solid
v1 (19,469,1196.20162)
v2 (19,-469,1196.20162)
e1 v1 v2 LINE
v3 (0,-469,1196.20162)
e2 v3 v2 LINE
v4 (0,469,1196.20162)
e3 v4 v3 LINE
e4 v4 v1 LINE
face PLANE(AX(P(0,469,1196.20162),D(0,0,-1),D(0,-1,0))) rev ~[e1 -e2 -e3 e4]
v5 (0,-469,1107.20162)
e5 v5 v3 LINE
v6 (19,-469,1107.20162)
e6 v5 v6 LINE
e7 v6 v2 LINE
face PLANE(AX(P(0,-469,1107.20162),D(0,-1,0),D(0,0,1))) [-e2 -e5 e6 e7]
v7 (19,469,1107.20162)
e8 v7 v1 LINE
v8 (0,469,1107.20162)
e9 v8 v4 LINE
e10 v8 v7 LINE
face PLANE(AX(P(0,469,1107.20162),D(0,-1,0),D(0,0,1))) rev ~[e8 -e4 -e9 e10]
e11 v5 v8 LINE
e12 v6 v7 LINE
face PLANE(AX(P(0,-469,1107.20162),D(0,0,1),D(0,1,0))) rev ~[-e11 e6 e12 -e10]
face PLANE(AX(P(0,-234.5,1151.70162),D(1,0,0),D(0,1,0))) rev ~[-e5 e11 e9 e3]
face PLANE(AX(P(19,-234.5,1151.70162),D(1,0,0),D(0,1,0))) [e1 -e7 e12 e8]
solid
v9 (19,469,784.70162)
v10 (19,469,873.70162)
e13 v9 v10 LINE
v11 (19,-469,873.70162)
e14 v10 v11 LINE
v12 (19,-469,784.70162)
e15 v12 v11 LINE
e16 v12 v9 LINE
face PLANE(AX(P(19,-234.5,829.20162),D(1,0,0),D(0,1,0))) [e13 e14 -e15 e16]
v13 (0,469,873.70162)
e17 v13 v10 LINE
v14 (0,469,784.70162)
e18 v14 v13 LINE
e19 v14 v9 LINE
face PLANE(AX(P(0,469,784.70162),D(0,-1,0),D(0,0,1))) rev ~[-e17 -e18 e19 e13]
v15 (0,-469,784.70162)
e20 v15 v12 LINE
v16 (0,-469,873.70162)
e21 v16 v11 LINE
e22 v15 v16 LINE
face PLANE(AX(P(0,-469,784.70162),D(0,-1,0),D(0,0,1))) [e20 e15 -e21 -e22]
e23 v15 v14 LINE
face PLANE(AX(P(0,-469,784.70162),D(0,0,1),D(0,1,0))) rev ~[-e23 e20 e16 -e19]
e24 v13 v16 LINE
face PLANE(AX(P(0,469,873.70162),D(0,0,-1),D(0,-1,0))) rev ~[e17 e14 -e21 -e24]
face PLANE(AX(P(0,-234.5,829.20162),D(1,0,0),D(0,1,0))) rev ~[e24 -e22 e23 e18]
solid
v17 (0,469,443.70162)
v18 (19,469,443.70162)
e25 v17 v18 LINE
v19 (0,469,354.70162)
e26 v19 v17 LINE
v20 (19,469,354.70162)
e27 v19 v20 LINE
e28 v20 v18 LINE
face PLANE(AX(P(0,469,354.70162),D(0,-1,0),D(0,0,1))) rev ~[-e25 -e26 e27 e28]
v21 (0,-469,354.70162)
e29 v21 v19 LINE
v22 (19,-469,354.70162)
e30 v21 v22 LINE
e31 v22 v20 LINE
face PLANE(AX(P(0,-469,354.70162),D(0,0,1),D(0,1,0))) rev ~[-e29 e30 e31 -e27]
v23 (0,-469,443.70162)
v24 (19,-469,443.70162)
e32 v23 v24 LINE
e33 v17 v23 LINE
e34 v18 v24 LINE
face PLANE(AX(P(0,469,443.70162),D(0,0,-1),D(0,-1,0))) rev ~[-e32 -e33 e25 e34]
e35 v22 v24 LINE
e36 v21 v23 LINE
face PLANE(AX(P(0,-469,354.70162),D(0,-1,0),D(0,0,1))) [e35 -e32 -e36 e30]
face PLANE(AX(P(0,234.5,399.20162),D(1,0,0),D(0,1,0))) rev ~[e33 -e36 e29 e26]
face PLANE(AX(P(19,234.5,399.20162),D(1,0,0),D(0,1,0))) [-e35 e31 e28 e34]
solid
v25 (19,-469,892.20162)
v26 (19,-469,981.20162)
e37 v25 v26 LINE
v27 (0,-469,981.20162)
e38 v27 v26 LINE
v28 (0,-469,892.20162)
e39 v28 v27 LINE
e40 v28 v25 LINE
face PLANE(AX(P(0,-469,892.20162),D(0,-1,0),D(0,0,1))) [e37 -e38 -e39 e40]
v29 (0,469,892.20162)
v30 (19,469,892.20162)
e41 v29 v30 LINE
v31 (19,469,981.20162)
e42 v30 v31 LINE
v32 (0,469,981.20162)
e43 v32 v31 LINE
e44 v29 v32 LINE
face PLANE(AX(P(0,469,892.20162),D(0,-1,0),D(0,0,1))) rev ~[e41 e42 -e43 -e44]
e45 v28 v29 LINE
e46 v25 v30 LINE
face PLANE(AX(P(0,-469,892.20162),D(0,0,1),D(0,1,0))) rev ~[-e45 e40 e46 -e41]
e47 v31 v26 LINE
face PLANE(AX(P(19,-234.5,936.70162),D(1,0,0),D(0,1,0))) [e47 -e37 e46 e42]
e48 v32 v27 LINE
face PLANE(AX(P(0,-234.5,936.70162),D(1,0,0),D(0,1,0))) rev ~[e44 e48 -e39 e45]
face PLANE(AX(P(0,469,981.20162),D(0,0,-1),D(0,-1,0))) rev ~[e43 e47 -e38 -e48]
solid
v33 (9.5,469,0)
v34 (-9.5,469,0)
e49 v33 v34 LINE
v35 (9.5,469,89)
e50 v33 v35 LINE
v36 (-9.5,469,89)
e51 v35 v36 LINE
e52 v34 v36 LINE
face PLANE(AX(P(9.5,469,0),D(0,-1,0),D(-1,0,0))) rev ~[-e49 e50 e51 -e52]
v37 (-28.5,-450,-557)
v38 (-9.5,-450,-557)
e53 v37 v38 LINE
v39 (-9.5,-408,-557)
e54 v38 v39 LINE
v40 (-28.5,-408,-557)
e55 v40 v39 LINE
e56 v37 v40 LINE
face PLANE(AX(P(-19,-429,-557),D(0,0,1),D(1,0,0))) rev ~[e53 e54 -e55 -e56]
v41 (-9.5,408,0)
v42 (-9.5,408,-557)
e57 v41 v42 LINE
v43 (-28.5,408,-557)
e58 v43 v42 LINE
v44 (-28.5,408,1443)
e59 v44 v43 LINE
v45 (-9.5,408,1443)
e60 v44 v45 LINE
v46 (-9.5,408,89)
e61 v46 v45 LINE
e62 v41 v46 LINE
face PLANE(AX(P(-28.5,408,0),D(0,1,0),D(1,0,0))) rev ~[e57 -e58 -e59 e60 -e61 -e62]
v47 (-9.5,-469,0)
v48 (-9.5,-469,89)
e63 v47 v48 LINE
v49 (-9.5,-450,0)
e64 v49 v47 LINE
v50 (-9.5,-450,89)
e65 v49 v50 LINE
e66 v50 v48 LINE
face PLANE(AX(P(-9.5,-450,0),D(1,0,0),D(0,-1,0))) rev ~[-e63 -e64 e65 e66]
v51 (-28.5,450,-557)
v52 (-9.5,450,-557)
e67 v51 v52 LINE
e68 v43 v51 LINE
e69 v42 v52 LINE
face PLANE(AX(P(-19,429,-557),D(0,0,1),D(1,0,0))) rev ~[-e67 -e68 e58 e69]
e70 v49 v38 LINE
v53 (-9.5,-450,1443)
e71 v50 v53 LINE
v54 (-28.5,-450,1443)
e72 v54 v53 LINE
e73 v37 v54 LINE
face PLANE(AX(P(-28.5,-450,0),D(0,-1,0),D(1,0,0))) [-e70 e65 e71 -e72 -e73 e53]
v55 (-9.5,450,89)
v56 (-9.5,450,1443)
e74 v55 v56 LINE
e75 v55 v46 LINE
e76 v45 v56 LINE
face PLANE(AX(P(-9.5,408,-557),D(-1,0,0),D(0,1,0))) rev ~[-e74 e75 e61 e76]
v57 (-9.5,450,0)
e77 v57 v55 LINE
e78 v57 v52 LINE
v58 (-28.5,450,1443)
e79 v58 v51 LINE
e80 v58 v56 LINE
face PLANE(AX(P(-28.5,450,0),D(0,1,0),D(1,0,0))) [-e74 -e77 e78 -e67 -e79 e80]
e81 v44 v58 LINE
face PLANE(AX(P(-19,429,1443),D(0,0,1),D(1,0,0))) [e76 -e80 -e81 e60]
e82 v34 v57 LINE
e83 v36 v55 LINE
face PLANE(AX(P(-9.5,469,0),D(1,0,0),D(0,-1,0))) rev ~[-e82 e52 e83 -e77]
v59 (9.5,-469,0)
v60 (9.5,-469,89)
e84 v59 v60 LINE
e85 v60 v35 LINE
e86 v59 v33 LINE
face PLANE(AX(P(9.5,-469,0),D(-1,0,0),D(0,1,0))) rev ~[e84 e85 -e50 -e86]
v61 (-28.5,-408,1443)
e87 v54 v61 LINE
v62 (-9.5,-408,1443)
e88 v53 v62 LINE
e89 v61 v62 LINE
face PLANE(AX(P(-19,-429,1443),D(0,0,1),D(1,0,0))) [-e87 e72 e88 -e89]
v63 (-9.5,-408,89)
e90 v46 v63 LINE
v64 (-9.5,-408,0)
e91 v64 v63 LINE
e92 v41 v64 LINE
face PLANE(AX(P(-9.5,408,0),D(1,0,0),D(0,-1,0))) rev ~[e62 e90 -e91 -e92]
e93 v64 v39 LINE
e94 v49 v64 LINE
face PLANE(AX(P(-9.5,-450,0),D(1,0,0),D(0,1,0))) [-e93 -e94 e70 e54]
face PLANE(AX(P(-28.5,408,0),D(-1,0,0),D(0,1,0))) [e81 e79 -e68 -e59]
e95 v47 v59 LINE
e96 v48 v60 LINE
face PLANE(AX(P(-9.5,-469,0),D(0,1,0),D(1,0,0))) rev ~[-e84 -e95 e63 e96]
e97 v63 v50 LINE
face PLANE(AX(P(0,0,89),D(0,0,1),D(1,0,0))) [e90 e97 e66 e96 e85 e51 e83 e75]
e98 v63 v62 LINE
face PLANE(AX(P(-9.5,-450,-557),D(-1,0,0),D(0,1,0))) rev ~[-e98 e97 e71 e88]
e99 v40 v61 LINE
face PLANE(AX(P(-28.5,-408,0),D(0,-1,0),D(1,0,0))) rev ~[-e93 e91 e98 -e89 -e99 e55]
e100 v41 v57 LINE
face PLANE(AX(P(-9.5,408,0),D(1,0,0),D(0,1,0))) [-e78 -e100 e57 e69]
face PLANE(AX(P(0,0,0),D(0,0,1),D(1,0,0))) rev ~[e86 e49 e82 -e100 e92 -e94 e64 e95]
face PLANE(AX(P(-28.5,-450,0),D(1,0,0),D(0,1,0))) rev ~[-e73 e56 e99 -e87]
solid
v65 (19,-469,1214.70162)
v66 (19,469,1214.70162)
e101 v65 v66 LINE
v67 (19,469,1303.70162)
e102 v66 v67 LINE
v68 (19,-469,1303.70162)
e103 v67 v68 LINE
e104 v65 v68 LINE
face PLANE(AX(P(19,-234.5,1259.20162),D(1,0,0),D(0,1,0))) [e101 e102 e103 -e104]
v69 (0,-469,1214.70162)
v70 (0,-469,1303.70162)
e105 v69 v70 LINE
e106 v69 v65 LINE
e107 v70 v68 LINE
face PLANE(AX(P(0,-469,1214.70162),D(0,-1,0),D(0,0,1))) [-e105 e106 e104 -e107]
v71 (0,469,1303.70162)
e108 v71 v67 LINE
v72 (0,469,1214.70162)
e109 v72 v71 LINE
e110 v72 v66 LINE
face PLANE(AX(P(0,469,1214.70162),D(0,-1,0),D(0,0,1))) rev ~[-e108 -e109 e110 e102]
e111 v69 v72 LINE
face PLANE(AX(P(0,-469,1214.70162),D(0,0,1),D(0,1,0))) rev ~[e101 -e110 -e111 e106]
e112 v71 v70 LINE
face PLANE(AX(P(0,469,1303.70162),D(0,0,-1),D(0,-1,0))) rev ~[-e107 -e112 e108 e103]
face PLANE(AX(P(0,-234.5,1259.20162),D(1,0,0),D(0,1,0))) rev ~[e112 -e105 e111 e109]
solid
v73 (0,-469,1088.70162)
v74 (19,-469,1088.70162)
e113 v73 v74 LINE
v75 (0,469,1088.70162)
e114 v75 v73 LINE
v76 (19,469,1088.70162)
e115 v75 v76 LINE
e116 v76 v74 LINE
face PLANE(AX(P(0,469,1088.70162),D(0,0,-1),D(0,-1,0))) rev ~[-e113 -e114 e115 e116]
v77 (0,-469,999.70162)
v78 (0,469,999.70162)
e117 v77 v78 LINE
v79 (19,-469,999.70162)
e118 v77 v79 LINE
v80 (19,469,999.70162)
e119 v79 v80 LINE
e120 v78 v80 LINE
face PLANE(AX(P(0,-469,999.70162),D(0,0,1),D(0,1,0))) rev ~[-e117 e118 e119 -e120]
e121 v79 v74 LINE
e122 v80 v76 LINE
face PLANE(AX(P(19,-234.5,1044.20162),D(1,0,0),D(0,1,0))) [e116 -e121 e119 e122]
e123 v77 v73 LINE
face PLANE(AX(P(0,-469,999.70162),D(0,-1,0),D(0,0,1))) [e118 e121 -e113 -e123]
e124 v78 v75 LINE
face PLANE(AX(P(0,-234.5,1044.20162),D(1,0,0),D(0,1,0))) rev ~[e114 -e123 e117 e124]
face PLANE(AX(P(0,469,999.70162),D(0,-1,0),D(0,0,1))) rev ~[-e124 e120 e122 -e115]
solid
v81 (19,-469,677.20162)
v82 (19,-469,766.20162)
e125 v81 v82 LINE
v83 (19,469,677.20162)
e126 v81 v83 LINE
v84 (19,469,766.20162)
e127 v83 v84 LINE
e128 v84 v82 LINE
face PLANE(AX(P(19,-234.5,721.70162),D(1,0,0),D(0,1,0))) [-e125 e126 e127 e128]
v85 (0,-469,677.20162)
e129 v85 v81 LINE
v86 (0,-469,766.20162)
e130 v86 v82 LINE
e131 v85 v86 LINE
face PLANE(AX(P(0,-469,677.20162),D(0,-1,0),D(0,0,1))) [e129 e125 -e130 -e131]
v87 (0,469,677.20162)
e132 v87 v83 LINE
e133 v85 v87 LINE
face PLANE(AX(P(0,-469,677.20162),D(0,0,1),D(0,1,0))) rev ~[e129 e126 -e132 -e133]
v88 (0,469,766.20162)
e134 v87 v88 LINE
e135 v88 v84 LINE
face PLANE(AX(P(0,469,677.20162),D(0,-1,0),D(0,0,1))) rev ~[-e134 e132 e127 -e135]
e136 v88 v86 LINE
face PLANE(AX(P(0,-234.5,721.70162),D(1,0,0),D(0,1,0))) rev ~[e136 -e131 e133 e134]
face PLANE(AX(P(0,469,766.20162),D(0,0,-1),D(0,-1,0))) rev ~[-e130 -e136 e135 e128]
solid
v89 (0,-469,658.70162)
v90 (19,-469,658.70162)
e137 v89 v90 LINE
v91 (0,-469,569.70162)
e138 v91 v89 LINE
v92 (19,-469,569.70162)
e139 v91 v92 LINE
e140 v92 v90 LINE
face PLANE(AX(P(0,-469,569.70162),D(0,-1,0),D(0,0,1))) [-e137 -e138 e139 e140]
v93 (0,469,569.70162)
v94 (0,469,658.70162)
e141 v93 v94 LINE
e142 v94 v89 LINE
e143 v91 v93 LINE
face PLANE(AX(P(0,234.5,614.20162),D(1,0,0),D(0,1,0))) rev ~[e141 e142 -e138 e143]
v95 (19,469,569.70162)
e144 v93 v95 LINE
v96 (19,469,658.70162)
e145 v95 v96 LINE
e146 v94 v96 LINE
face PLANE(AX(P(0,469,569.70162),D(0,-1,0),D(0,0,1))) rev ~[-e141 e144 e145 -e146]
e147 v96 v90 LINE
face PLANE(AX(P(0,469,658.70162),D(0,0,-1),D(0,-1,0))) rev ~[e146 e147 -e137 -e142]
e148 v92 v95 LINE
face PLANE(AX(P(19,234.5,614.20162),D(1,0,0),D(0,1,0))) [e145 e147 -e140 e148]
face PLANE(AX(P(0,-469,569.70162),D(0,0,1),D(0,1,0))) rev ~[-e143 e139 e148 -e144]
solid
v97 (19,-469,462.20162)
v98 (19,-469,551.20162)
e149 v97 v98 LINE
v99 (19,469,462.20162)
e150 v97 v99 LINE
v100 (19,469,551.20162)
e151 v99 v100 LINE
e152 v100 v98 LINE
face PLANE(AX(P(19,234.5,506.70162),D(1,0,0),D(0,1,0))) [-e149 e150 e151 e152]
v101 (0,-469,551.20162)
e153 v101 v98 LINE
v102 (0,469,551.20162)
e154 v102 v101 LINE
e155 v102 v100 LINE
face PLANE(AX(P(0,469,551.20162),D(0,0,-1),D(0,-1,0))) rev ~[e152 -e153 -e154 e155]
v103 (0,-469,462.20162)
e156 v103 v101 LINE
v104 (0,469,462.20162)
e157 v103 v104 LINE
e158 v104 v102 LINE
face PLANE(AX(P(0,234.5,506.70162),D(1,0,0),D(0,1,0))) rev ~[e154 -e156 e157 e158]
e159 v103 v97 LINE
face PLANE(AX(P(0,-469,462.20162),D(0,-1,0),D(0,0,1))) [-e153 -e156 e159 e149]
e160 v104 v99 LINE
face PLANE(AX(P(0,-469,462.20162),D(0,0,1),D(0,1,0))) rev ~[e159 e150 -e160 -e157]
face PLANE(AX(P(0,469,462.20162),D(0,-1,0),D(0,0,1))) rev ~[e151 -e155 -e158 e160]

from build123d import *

# Parameters (mm, degrees)
F0_W     = 19
F0_H     = 42
F1_DEPTH = 89
F2_DEPTH = 557
F3_DEPTH = 2000
F4_W     = 469
F4_H     = 89
F5_DEPTH = 19


# Not quite as in the source:
# - a feature names something its author has since deleted; it is built from what else it names


with BuildPart() as f1:
    # F0 (on Top) → F1 (new body)
    with BuildSketch(Plane.XY):
        Polygon((-9.5, -469), (9.5, -469), (9.5, 469), (-9.5, 469), (-9.5, 450), (-9.5, 408), (-9.5, -408), (-9.5, -450), align=None)
        with Locations((-19, -429)):
            Rectangle(F0_W, F0_H)
        with Locations((-19, 429)):
            Rectangle(F0_W, F0_H)
    extrude(amount=F1_DEPTH)

    # F0 (on Top) → F2 (join)
    with BuildSketch(Plane.XY):
        with Locations((-19, -429)):
            Rectangle(F0_W, F0_H)
        with Locations((-19, 429)):
            Rectangle(F0_W, F0_H)
    extrude(amount=-F2_DEPTH)

    # F3 (add): faces of the model
    f3_faces = [f1.faces().sort_by_distance(p)[0] for p in [
        (-19, 429, -557),
        (-19, -429, -557),
    ]]
    extrude(f3_faces, amount=-F3_DEPTH)


with BuildPart() as f5:
    # F4 (on Right) → F5 (new body)
    with BuildSketch(Plane.YZ):
        Polygon((64.7416710854, 443.7016204007), (0, 443.7016204007), (0, 354.7016204007), (469, 354.7016204007), (469, 443.7016204007), align=None)
        with Locations((-234.5, 399.2016204007)):
            Rectangle(F4_W, F4_H)
    extrude(amount=F5_DEPTH)


with BuildPart() as f5b:
    # F4 (on Right) → F5, piece 2 (new body)
    with BuildSketch(Plane.YZ):
        Polygon((51.5239238739, 551.2016204007), (0, 551.2016204007), (0, 462.2016204007), (64.7416710854, 462.2016204007), (469, 462.2016204007), (469, 551.2016204007), align=None)
        with Locations((-234.5, 506.7016204007)):
            Rectangle(F4_W, F4_H)
    extrude(amount=F5_DEPTH)


with BuildPart() as f5c:
    # F4 (on Right) → F5, piece 3 (new body)
    with BuildSketch(Plane.YZ):
        Polygon((59.0889453888, 658.7016204007), (0, 658.7016204007), (0, 569.7016204007), (51.5239238739, 569.7016204007), (469, 569.7016204007), (469, 658.7016204007), align=None)
        with Locations((-234.5, 614.2016204007)):
            Rectangle(F4_W, F4_H)
    extrude(amount=F5_DEPTH)


with BuildPart() as f5d:
    # F4 (on Right) → F5, piece 4 (new body)
    with BuildSketch(Plane.YZ):
        with Locations((-234.5, 1259.2016204007)):
            Rectangle(F4_W, F4_H)
        Polygon((0, 1303.7016204007), (0, 1214.7016204007), (46.117246151, 1214.7016204007), (469, 1214.7016204007), (469, 1303.7016204007), align=None)
    extrude(amount=F5_DEPTH)


with BuildPart() as f5e:
    # F4 (on Right) → F5, piece 5 (new body)
    with BuildSketch(Plane.YZ):
        with Locations((-234.5, 1151.7016204007)):
            Rectangle(F4_W, F4_H)
        Polygon((0, 1196.2016204007), (0, 1107.2016204007), (34.1612100601, 1107.2016204007), (469, 1107.2016204007), (469, 1196.2016204007), (46.117246151, 1196.2016204007), align=None)
    extrude(amount=F5_DEPTH)


with BuildPart() as f5f:
    # F4 (on Right) → F5, piece 6 (new body)
    with BuildSketch(Plane.YZ):
        with Locations((-234.5, 1044.2016204007)):
            Rectangle(F4_W, F4_H)
        Polygon((0, 1088.7016204007), (0, 999.7016204007), (44.2955195904, 999.7016204007), (469, 999.7016204007), (469, 1088.7016204007), (34.1612100601, 1088.7016204007), align=None)
    extrude(amount=F5_DEPTH)


with BuildPart() as f5g:
    # F4 (on Right) → F5, piece 7 (new body)
    with BuildSketch(Plane.YZ):
        with Locations((-234.5, 936.7016204007)):
            Rectangle(F4_W, F4_H)
        Polygon((0, 981.2016204007), (0, 892.2016204007), (57.986497879, 892.2016204007), (469, 892.2016204007), (469, 981.2016204007), (44.2955195904, 981.2016204007), align=None)
    extrude(amount=F5_DEPTH)


with BuildPart() as f5h:
    # F4 (on Right) → F5, piece 8 (new body)
    with BuildSketch(Plane.YZ):
        with Locations((-234.5, 829.2016204007)):
            Rectangle(F4_W, F4_H)
        Polygon((0, 873.7016204007), (0, 784.7016204007), (90.5175209045, 784.7016204007), (469, 784.7016204007), (469, 873.7016204007), (57.986497879, 873.7016204007), align=None)
    extrude(amount=F5_DEPTH)


with BuildPart() as f5i:
    # F4 (on Right) → F5, piece 9 (new body)
    with BuildSketch(Plane.YZ):
        with Locations((-234.5, 721.7016204007)):
            Rectangle(F4_W, F4_H)
        Polygon((0, 766.2016204007), (0, 677.2016204007), (59.0889453888, 677.2016204007), (469, 677.2016204007), (469, 766.2016204007), (90.5175209045, 766.2016204007), align=None)
    extrude(amount=F5_DEPTH)


solid = Compound([f1.part, f5.part, f5b.part, f5c.part, f5d.part, f5e.part, f5f.part, f5g.part, f5h.part, f5i.part])
